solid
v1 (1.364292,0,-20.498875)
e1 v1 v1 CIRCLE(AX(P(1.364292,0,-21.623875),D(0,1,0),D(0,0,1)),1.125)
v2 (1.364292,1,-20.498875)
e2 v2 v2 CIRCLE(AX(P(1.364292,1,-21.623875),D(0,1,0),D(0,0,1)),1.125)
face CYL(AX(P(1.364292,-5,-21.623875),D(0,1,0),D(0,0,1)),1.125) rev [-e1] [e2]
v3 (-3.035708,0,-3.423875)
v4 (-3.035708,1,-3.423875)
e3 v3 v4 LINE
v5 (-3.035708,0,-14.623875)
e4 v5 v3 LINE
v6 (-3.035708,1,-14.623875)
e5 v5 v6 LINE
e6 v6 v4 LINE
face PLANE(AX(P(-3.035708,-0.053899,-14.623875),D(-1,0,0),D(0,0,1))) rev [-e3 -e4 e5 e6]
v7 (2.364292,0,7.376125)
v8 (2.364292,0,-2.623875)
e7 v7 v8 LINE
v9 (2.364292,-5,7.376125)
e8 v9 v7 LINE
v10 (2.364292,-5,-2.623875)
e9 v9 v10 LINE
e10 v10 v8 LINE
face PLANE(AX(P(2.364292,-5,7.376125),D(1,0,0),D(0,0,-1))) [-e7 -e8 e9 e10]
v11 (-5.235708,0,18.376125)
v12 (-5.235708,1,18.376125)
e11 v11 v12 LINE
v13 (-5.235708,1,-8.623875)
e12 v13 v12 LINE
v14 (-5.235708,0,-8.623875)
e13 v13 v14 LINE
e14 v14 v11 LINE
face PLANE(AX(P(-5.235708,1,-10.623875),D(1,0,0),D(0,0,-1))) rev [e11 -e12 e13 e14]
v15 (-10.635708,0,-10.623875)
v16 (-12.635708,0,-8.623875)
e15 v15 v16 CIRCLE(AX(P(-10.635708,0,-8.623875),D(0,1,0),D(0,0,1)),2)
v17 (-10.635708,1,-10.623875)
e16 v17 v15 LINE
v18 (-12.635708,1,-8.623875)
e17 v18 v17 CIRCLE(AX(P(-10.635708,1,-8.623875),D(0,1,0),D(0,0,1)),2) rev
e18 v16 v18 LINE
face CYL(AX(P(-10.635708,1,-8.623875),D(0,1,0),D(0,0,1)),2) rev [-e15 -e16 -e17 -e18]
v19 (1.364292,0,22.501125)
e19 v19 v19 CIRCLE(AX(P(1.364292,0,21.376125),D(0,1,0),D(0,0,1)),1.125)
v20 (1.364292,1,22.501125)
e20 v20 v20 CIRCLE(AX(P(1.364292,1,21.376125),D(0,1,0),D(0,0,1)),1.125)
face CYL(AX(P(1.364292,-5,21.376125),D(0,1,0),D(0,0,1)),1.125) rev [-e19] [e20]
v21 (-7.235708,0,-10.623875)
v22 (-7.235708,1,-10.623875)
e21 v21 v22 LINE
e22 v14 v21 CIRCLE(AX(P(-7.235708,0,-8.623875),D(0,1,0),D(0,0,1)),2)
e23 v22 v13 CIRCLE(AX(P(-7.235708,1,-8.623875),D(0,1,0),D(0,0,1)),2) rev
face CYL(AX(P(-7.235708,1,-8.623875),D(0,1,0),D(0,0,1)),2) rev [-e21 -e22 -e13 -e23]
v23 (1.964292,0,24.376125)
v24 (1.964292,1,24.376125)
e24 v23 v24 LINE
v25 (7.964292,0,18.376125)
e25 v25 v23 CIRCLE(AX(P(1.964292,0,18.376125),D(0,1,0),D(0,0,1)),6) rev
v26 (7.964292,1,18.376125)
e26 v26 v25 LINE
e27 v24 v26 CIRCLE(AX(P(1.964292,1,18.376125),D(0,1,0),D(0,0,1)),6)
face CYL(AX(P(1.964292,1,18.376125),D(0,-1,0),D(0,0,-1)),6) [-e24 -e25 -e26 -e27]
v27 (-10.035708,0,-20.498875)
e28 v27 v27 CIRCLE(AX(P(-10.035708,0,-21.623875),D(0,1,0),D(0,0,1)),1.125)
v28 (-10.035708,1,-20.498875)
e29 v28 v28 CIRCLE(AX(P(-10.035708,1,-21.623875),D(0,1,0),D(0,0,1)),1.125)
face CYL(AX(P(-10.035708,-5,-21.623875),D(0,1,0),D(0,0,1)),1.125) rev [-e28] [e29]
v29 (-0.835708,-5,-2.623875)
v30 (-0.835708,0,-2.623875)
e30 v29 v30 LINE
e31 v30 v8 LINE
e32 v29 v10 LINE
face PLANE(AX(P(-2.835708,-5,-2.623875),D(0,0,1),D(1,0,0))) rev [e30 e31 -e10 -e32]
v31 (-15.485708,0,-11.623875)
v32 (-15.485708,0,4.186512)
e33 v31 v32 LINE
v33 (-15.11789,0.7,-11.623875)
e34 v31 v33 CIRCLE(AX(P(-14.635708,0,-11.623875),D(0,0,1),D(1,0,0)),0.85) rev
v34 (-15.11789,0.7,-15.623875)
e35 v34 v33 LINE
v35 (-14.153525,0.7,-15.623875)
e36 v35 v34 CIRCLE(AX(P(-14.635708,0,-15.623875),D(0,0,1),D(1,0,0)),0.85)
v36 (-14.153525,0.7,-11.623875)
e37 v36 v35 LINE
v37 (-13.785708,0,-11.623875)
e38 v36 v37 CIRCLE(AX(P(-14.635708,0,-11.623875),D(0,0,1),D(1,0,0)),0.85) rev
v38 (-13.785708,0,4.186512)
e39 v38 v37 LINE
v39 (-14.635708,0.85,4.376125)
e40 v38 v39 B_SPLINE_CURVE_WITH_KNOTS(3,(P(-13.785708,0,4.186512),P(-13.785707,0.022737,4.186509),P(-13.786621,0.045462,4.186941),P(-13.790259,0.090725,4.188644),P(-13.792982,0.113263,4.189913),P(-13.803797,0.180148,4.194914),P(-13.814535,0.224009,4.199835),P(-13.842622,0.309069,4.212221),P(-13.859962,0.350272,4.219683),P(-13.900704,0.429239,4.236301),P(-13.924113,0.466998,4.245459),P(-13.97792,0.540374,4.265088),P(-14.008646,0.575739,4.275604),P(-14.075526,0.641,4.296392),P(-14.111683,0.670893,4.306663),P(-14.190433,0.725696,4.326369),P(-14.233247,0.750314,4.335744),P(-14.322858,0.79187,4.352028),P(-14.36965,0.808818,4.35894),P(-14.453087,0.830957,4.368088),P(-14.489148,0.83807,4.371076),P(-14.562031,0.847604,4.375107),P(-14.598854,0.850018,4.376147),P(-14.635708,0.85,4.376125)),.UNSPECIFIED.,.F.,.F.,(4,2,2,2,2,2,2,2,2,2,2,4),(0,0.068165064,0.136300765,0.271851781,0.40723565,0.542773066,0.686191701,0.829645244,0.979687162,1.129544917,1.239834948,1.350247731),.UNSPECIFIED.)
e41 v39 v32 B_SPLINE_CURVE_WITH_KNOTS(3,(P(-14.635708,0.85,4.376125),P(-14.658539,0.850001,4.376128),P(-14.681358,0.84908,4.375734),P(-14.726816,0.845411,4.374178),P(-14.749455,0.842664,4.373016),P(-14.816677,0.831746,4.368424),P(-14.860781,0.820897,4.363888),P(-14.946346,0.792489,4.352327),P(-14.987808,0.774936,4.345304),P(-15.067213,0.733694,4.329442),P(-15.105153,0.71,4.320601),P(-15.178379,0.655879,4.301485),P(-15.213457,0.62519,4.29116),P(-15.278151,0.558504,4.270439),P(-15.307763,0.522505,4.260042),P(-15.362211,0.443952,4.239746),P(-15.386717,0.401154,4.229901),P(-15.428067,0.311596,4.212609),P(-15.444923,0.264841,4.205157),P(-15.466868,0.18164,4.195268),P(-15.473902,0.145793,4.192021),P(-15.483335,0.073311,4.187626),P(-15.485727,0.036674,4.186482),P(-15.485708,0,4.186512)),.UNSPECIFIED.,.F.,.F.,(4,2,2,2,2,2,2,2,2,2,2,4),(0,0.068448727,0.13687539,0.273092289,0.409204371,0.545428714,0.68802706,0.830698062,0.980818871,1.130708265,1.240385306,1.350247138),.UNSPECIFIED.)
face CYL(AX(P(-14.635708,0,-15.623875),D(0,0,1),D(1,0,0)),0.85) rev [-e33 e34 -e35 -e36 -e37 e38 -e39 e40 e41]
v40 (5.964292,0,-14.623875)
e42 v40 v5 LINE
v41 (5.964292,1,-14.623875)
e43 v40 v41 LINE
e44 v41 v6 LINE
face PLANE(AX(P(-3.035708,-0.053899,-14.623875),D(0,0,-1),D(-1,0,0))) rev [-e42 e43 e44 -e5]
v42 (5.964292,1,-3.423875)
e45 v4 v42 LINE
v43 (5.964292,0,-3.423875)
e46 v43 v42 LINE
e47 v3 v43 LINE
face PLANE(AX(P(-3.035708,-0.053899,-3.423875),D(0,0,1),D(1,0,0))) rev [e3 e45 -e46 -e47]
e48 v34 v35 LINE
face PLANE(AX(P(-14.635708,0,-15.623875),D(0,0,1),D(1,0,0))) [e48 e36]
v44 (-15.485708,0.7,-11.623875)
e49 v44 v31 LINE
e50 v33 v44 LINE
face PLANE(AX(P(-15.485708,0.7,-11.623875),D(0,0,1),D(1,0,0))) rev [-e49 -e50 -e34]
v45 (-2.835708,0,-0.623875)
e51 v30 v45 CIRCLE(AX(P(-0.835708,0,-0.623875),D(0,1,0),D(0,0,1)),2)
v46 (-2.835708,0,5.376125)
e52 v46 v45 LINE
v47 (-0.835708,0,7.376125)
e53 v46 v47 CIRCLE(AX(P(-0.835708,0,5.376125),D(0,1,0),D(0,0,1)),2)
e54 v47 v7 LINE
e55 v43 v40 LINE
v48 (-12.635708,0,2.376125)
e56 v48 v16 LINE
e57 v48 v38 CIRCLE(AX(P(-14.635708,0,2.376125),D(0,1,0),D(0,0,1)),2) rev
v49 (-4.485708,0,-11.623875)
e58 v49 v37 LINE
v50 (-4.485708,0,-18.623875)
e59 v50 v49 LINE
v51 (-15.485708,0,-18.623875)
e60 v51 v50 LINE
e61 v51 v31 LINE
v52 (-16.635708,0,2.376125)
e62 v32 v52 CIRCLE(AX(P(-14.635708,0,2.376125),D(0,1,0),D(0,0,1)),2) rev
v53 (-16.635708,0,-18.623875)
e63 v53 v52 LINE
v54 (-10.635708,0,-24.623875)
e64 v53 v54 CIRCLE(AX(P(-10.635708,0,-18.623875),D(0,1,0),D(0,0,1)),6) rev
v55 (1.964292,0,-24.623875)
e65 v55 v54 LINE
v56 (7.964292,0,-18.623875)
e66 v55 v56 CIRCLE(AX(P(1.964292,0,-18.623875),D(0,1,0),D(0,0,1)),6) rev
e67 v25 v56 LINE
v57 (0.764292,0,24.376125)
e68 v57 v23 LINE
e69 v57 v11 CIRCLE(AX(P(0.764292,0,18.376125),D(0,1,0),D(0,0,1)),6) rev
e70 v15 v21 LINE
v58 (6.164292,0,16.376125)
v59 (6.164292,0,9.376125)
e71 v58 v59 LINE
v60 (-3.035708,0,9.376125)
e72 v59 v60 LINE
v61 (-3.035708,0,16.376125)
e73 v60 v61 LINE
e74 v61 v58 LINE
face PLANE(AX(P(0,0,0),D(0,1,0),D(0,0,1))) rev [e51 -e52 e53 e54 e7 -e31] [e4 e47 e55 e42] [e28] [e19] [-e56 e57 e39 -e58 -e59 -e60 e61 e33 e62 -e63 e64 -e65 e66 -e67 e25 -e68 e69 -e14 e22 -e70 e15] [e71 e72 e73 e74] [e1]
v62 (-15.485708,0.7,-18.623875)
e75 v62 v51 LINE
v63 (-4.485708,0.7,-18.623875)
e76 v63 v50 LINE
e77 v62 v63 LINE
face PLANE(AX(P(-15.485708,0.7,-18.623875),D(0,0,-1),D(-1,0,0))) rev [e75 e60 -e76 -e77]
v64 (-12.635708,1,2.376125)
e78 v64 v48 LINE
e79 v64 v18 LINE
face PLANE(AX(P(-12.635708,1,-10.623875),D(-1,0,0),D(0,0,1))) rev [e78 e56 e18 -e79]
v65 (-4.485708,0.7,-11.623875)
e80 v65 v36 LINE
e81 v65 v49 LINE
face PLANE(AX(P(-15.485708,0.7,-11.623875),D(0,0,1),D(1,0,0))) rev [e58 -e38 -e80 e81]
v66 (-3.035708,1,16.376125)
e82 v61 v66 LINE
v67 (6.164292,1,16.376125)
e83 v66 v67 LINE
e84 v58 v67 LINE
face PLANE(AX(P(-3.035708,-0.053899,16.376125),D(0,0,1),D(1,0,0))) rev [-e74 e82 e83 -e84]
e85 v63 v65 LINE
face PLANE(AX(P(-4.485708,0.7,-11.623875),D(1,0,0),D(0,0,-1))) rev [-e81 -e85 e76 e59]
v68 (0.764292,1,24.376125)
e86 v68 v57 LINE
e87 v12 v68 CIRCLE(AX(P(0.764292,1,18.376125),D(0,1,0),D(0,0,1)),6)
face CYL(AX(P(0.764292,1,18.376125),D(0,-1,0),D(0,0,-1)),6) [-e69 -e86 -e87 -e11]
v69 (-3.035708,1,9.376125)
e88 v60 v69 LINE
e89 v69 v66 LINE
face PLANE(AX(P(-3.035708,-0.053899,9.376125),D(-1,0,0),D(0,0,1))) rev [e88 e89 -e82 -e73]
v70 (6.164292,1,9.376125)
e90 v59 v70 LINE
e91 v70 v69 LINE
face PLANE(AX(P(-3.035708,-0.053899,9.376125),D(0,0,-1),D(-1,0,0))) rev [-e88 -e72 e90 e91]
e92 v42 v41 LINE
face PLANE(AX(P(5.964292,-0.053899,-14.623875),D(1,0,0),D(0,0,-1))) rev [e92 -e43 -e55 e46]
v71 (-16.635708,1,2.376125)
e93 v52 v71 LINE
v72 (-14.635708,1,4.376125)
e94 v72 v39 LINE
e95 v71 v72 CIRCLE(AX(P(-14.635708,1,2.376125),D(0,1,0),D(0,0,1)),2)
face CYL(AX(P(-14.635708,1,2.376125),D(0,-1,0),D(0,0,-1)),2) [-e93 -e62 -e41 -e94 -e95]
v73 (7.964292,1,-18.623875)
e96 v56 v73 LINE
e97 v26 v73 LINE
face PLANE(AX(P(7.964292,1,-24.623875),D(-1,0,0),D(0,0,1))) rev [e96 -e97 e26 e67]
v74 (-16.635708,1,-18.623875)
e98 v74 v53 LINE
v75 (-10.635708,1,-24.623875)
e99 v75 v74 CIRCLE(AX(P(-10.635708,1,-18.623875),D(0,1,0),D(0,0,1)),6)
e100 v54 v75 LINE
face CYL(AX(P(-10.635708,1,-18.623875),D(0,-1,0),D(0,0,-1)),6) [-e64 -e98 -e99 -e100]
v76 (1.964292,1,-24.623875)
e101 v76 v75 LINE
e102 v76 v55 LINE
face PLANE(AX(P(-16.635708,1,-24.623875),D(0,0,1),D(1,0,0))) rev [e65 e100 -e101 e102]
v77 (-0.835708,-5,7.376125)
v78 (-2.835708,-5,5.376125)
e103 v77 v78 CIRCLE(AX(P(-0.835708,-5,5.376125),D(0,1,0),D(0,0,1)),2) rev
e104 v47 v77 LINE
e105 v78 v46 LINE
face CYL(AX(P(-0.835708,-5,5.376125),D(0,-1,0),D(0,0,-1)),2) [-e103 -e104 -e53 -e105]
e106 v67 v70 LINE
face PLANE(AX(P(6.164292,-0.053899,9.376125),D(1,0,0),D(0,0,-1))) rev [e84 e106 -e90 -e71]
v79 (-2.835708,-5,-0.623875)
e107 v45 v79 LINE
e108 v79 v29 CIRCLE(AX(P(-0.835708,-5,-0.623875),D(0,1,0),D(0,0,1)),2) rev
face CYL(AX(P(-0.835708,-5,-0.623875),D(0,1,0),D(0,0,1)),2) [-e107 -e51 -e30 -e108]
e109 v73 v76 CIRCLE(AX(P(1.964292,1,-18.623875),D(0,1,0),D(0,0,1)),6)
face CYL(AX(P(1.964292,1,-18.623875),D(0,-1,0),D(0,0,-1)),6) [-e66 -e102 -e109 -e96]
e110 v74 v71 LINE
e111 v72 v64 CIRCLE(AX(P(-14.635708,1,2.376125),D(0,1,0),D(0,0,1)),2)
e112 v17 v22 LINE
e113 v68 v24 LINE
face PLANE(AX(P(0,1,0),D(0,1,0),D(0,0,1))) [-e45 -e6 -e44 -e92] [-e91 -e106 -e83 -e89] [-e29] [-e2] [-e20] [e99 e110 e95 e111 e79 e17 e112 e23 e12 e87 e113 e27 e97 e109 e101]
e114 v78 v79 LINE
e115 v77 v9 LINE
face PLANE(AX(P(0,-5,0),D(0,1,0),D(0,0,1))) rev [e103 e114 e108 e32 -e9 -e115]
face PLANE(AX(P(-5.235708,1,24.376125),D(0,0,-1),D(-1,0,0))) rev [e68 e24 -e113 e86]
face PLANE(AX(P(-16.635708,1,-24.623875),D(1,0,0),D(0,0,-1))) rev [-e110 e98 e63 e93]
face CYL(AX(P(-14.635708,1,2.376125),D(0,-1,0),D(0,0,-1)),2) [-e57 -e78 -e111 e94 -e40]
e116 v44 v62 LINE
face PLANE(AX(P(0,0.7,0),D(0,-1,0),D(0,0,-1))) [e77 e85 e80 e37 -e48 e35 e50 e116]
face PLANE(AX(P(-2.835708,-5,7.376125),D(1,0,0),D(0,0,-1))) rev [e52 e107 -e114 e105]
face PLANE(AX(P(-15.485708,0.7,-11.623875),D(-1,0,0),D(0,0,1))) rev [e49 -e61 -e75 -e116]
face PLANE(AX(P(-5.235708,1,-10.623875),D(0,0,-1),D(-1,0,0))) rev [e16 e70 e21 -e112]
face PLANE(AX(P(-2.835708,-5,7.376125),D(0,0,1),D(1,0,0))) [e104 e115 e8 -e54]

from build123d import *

# Parameters (mm, degrees)
BOSS_EXTRUDE1_DEPTH = 1
SKETCH4_R           = 1.125
CUT_EXTRUDE3_DEPTH  = 6
FILLET1_R           = 6
FILLET2_R           = 2
SKETCH3_R           = 0.85
CUT_EXTRUDE5_DEPTH  = 20
SKETCH6_W           = 11
SKETCH6_H           = 7
CUT_EXTRUDE6_DEPTH  = 0.7
SKETCH7_W           = 9.2
SKETCH7_H           = 7
SKETCH7_W_2         = 9
SKETCH7_H_2         = 11.2
CUT_EXTRUDE7_DEPTH  = 30.733515978
SKETCH8_W           = 5.2
SKETCH8_H           = 10
BOSS_EXTRUDE2_DEPTH = 5
FILLET4_R           = 2


with BuildPart() as part:
    # Sketch1 → Boss-Extrude1 (new body)
    with BuildSketch(Plane(origin=(0, 0, 0), x_dir=(1, 0, 0), z_dir=(0, 1, 0))):
        Polygon((-16.635707691, 24.623874564), (7.964292309, 24.623874564), (7.964292309, -24.376125436), (-5.235707691, -24.376125436), (-5.235707691, 10.623874564), (-12.635707691, 10.623874564), (-12.635707691, -4.376125436), (-16.635707691, -4.376125436), align=None)
    extrude(amount=BOSS_EXTRUDE1_DEPTH)

    # Sketch4 → Cut-Extrude3 (cut)
    with BuildSketch(Plane(origin=(0, 1, 0), x_dir=(1, 0, 0), z_dir=(0, 1, 0))):
        with Locations(Location((-10.035707691, 21.623874564, 0), (0, 0, 270))):
            Circle(SKETCH4_R)
        with Locations(Location((1.364292309, 21.623874564, 0), (0, 0, 270))):
            Circle(SKETCH4_R)
        with Locations(Location((1.364292309, -21.376125436, 0), (0, 0, 270))):
            Circle(SKETCH4_R)
    extrude(amount=-CUT_EXTRUDE3_DEPTH, mode=Mode.SUBTRACT)

    # Fillet1
    fillet1_edges = [part.edges().sort_by_distance(p)[0] for p in [
        (-16.635707691, 0.5, -24.623874564),
        (7.964292309, 0.5, -24.623874564),
        (7.964292309, 0.5, 24.376125436),
        (-5.235707691, 0.5, 24.376125436),
    ]]
    fillet(fillet1_edges, radius=FILLET1_R)

    # Fillet2
    fillet2_edges = [part.edges().sort_by_distance(p)[0] for p in [
        (-5.235707691, 0.5, -10.623874564),
        (-12.635707691, 0.5, -10.623874564),
    ]]
    fillet(fillet2_edges, radius=FILLET2_R)
    fillet2_2_edges = [part.edges().sort_by_distance(p)[0] for p in [
        (-12.635707691, 0.5, 4.376125436),
        (-16.635707691, 0.5, 4.376125436),
    ]]
    fillet(fillet2_2_edges, radius=FILLET2_R - 0.0001)  # a hair under: the kernel refuses the full size

    # Sketch3 → Cut-Extrude5 (cut)
    with BuildSketch(Plane.XY.offset(4.376125436)):
        with Locations((-14.635707691, 0)):
            Circle(SKETCH3_R)
    extrude(amount=-CUT_EXTRUDE5_DEPTH, mode=Mode.SUBTRACT)

    # Sketch6 → Cut-Extrude6 (cut)
    with BuildSketch(Plane.XZ):
        with Locations((-9.985707691, -15.123874564)):
            Rectangle(SKETCH6_W, SKETCH6_H)
    extrude(amount=-CUT_EXTRUDE6_DEPTH, mode=Mode.SUBTRACT)

    # Sketch7 → Cut-Extrude7 (cut, through all)
    with BuildSketch(Plane(origin=(0, 1, 0), x_dir=(1, 0, 0), z_dir=(0, 1, 0))):
        with Locations((1.564292309, -12.876125436)):
            Rectangle(SKETCH7_W, SKETCH7_H)
        with Locations((1.464292309, 9.023874564)):
            Rectangle(SKETCH7_W_2, SKETCH7_H_2)
    extrude(amount=-CUT_EXTRUDE7_DEPTH, mode=Mode.SUBTRACT)

    # Sketch8 → Boss-Extrude2 (add)
    with BuildSketch(Plane.XZ):
        with Locations((-0.235707691, 2.376125436)):
            Rectangle(SKETCH8_W, SKETCH8_H)
    extrude(amount=BOSS_EXTRUDE2_DEPTH)

    # Fillet4
    fillet4_edges = [part.edges().sort_by_distance(p)[0] for p in [
        (-2.835707691, -2.5, 7.376125436),
        (-2.835707691, -2.5, -2.623874564),
    ]]
    fillet(fillet4_edges, radius=FILLET4_R)


solid = part.part
